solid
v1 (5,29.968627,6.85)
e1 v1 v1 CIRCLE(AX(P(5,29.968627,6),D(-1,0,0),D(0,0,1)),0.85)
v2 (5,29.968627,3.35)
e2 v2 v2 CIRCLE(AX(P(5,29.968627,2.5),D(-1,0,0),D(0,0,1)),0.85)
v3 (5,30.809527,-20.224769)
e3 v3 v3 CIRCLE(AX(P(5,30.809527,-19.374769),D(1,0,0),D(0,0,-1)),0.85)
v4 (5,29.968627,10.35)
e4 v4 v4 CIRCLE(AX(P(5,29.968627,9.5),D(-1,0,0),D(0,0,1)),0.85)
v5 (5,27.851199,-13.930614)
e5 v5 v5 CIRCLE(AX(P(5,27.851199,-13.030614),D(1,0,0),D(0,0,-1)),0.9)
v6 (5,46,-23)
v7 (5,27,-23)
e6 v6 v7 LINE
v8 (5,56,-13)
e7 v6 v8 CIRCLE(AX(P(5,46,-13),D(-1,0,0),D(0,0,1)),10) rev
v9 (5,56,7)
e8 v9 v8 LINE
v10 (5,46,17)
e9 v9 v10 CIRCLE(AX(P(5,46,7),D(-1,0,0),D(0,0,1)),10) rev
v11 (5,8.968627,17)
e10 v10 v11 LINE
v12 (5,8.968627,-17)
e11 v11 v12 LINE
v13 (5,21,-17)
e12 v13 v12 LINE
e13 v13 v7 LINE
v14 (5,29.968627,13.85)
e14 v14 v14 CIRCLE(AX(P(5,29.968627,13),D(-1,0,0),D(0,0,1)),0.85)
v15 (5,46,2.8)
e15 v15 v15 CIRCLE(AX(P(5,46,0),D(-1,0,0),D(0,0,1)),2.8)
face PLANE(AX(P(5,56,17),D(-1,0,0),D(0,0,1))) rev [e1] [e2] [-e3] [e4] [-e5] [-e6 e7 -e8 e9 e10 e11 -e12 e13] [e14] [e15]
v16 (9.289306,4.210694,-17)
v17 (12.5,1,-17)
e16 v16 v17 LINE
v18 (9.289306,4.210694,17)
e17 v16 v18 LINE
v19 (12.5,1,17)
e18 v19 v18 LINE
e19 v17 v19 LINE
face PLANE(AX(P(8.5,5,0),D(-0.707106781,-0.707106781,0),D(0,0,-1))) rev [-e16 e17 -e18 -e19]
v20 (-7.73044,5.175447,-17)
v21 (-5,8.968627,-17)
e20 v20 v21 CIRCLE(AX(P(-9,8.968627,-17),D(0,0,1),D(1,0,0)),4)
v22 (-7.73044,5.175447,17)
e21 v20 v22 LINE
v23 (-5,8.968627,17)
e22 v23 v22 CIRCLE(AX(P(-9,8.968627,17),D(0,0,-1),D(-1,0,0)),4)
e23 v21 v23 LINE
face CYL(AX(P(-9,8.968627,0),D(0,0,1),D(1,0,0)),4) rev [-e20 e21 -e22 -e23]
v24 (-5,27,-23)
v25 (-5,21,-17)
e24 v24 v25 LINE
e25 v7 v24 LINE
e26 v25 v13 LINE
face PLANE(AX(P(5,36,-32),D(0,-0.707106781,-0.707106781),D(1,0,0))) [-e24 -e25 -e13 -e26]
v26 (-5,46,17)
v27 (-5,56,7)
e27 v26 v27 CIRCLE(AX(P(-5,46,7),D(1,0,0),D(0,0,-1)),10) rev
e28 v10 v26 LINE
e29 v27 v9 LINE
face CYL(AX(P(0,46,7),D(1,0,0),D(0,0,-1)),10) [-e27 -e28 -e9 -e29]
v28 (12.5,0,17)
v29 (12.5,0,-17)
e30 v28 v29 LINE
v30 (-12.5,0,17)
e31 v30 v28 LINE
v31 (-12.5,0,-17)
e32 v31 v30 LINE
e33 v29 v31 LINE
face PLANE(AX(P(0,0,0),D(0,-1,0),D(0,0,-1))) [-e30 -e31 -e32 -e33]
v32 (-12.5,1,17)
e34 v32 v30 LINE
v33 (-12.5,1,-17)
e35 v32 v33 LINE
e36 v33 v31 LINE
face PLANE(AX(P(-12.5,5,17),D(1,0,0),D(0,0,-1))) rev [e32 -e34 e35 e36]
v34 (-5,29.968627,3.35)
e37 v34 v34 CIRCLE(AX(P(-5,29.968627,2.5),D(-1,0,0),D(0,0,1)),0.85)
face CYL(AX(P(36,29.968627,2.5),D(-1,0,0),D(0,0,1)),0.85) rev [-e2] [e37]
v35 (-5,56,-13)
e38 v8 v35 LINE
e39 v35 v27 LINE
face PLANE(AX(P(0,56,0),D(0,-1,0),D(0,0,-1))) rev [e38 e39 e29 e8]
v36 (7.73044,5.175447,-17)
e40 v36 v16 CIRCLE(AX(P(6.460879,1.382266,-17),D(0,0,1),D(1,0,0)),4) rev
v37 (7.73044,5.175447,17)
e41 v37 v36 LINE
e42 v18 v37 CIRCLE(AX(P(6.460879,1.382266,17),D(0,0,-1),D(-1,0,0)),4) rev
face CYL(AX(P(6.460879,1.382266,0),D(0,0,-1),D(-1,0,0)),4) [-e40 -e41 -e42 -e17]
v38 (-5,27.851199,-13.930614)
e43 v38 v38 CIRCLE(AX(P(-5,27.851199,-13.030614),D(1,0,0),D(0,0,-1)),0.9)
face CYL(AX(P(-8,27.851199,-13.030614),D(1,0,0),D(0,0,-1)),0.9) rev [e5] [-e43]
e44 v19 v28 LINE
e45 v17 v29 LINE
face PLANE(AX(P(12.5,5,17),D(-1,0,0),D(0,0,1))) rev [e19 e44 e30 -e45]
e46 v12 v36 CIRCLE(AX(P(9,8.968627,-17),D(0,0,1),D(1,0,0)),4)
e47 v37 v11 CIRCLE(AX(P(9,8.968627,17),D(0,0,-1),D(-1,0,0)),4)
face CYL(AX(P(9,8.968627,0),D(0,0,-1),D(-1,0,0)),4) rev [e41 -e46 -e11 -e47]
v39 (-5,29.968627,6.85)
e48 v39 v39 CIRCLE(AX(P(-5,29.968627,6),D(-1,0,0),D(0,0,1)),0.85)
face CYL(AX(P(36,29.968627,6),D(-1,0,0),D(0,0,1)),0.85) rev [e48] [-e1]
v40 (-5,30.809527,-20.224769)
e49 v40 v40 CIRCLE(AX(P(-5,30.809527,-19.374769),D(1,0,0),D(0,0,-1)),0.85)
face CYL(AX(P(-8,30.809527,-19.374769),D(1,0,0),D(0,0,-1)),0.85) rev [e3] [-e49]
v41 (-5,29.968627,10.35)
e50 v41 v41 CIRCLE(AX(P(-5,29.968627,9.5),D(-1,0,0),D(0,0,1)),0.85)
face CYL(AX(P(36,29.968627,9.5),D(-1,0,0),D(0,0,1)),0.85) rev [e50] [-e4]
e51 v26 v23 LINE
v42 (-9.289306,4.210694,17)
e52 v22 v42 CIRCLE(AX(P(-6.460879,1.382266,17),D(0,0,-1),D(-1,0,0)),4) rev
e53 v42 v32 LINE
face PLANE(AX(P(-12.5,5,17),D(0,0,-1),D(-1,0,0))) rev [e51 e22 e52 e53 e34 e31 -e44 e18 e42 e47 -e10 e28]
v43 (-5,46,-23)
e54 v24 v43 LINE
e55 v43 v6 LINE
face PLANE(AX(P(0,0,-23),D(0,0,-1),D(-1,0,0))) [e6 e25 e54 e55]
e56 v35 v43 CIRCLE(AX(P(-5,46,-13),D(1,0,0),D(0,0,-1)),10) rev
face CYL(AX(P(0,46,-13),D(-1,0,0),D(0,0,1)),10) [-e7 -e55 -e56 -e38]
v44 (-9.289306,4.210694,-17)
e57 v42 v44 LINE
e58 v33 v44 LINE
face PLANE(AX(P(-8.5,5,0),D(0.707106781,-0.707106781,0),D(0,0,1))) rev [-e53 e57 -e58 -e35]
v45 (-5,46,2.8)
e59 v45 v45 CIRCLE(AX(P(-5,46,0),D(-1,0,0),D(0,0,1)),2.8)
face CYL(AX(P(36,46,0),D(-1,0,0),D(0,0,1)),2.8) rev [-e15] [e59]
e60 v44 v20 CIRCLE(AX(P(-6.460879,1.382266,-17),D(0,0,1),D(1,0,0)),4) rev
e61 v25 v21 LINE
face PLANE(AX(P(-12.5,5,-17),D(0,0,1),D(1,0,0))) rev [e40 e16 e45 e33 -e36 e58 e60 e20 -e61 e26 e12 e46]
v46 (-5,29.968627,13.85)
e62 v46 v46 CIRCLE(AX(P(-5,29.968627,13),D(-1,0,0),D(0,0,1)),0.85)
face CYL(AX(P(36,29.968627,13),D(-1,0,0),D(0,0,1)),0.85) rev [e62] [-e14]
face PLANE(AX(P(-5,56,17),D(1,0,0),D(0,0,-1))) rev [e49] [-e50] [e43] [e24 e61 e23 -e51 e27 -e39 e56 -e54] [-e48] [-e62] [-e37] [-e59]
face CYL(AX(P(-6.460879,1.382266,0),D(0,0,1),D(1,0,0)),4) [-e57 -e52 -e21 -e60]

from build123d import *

# Parameters (mm, degrees)
SKETCH1_W           = 25
SKETCH1_H           = 34
BOSS_EXTRUDE1_DEPTH = 5
SKETCH2_W           = 10
SKETCH2_H           = 34
BOSS_EXTRUDE2_DEPTH = 51
SKETCH3_R           = 2.8
CUT_EXTRUDE1_DEPTH  = 41
CHAMFER1_SIZE       = 4
FILLET1_R           = 4
FILLET2_R           = 4
SKETCH4_R           = 0.85
CUT_EXTRUDE2_DEPTH  = 41
SKETCH5_W           = 10
SKETCH5_H           = 20
BOSS_EXTRUDE3_DEPTH = 6
CHAMFER3_SIZE       = 15
FILLET4_R           = 10
SKETCH7_R           = 0.9
SKETCH7_R_2         = 0.85
CUT_EXTRUDE3_DEPTH  = 13


with BuildPart() as part:
    # Sketch1 → Boss-Extrude1 (new body)
    with BuildSketch(Plane(origin=(0, 0, 0), x_dir=(1, 0, 0), z_dir=(0, 1, 0))):
        Rectangle(SKETCH1_W, SKETCH1_H)
    extrude(amount=BOSS_EXTRUDE1_DEPTH)

    # Sketch2 → Boss-Extrude2 (add)
    with BuildSketch(Plane(origin=(0, 5, 0), x_dir=(1, 0, 0), z_dir=(0, 1, 0))):
        Rectangle(SKETCH2_W, SKETCH2_H)
    extrude(amount=BOSS_EXTRUDE2_DEPTH)

    # Sketch3 → Cut-Extrude1 (cut)
    with BuildSketch(Plane.ZY.offset(5)):
        with Locations((0, 46)):
            Circle(SKETCH3_R)
    extrude(amount=-CUT_EXTRUDE1_DEPTH, mode=Mode.SUBTRACT)

    # Chamfer1
    chamfer1_edges = [part.edges().sort_by_distance(p)[0] for p in [
        (-12.5, 5, 0),
        (12.5, 5, 0),
    ]]
    chamfer(chamfer1_edges, length=CHAMFER1_SIZE)

    # Fillet1
    # the kernel refuses this fillet: 4 mm, written as the material it adds along each edge
    with BuildSketch(Plane(origin=(5, 5, 17), x_dir=(1, 0, 0), z_dir=(0, 0, -1)), Plane(origin=(-5, 5, -17), x_dir=(-1, 0, 0), z_dir=(0, 0, 1))) as fillet1_piece_1:
        with BuildLine():
            CenterArc((4, -3.968626967), FILLET1_R, 97.180755781, 82.819244219)
            Line((0, -3.968626967), (-0.08, -3.968626967))
            Line((-0.08, -3.968626967), (-0.08, 0))
            Line((-0.08, 0), (0, 0.08))
            ThreePointArc((0, 0.08), (1.75, 0.08), (3.49, 0.079372539))
            Line((3.49, 0.079372539), (3.5, 0))
        make_face()
    extrude(amount=34)

    # Fillet2
    fillet2_edges = [part.edges().sort_by_distance(p)[0] for p in [
        (8.5, 5, 0),
        (-8.5, 5, 0),
    ]]
    fillet(fillet2_edges, radius=FILLET2_R)

    # Sketch4 → Cut-Extrude2 (cut)
    with BuildSketch(Plane.ZY.offset(5)):
        with Locations((6, 29.968626967)):
            Circle(SKETCH4_R)
        with Locations((13, 29.968626967)):
            Circle(SKETCH4_R)
        with Locations((2.5, 29.968626967)):
            Circle(SKETCH4_R)
        with Locations((9.5, 29.968626967)):
            Circle(SKETCH4_R)
    extrude(amount=-CUT_EXTRUDE2_DEPTH, mode=Mode.SUBTRACT)

    # Sketch5 → Boss-Extrude3 (add)
    with BuildSketch(Plane(origin=(0, 0, -17), x_dir=(-1, 0, 0), z_dir=(0, 0, -1))):
        with Locations((0, 46)):
            Rectangle(SKETCH5_W, SKETCH5_H)
    extrude(amount=BOSS_EXTRUDE3_DEPTH)

    # Chamfer3
    # the kernel refuses this chamfer: 15 mm, written as the material it adds along each edge
    with BuildSketch(Plane(origin=(-5, 36, -17), x_dir=(0, -0.9996219169112968, 0.02749587661058632), z_dir=(1, 0, 0))) as chamfer3_piece_1_section:
        Polygon((CHAMFER3_SIZE * 0.999621916911, CHAMFER3_SIZE * 0.0274958766106), (-CHAMFER3_SIZE * 0.0274958766106, CHAMFER3_SIZE * 0.999621916911), (0, 0), align=None)
    chamfer3_piece_1 = extrude(amount=10, mode=Mode.PRIVATE)
    chamfer3_piece_1 = split(chamfer3_piece_1, bisect_by=Plane(origin=(0, 29.791642651, -23), z_dir=(0, 0, 1)), keep=Keep.TOP, mode=Mode.PRIVATE)
    add(chamfer3_piece_1)

    # Fillet4
    fillet4_edges = [part.edges().sort_by_distance(p)[0] for p in [
        (0, 56, 17),
        (0, 56, -23),
    ]]
    fillet(fillet4_edges, radius=FILLET4_R)

    # Sketch7 → Cut-Extrude3 (cut)
    with BuildSketch(Plane(origin=(5, 0, 0), x_dir=(0, 0, -1), z_dir=(1, 0, 0))):
        with Locations((13.030614343, 27.851199121)):
            Circle(SKETCH7_R)
        with Locations((19.374768852, 30.809526953)):
            Circle(SKETCH7_R_2)
    extrude(amount=-CUT_EXTRUDE3_DEPTH, mode=Mode.SUBTRACT)


solid = part.part
